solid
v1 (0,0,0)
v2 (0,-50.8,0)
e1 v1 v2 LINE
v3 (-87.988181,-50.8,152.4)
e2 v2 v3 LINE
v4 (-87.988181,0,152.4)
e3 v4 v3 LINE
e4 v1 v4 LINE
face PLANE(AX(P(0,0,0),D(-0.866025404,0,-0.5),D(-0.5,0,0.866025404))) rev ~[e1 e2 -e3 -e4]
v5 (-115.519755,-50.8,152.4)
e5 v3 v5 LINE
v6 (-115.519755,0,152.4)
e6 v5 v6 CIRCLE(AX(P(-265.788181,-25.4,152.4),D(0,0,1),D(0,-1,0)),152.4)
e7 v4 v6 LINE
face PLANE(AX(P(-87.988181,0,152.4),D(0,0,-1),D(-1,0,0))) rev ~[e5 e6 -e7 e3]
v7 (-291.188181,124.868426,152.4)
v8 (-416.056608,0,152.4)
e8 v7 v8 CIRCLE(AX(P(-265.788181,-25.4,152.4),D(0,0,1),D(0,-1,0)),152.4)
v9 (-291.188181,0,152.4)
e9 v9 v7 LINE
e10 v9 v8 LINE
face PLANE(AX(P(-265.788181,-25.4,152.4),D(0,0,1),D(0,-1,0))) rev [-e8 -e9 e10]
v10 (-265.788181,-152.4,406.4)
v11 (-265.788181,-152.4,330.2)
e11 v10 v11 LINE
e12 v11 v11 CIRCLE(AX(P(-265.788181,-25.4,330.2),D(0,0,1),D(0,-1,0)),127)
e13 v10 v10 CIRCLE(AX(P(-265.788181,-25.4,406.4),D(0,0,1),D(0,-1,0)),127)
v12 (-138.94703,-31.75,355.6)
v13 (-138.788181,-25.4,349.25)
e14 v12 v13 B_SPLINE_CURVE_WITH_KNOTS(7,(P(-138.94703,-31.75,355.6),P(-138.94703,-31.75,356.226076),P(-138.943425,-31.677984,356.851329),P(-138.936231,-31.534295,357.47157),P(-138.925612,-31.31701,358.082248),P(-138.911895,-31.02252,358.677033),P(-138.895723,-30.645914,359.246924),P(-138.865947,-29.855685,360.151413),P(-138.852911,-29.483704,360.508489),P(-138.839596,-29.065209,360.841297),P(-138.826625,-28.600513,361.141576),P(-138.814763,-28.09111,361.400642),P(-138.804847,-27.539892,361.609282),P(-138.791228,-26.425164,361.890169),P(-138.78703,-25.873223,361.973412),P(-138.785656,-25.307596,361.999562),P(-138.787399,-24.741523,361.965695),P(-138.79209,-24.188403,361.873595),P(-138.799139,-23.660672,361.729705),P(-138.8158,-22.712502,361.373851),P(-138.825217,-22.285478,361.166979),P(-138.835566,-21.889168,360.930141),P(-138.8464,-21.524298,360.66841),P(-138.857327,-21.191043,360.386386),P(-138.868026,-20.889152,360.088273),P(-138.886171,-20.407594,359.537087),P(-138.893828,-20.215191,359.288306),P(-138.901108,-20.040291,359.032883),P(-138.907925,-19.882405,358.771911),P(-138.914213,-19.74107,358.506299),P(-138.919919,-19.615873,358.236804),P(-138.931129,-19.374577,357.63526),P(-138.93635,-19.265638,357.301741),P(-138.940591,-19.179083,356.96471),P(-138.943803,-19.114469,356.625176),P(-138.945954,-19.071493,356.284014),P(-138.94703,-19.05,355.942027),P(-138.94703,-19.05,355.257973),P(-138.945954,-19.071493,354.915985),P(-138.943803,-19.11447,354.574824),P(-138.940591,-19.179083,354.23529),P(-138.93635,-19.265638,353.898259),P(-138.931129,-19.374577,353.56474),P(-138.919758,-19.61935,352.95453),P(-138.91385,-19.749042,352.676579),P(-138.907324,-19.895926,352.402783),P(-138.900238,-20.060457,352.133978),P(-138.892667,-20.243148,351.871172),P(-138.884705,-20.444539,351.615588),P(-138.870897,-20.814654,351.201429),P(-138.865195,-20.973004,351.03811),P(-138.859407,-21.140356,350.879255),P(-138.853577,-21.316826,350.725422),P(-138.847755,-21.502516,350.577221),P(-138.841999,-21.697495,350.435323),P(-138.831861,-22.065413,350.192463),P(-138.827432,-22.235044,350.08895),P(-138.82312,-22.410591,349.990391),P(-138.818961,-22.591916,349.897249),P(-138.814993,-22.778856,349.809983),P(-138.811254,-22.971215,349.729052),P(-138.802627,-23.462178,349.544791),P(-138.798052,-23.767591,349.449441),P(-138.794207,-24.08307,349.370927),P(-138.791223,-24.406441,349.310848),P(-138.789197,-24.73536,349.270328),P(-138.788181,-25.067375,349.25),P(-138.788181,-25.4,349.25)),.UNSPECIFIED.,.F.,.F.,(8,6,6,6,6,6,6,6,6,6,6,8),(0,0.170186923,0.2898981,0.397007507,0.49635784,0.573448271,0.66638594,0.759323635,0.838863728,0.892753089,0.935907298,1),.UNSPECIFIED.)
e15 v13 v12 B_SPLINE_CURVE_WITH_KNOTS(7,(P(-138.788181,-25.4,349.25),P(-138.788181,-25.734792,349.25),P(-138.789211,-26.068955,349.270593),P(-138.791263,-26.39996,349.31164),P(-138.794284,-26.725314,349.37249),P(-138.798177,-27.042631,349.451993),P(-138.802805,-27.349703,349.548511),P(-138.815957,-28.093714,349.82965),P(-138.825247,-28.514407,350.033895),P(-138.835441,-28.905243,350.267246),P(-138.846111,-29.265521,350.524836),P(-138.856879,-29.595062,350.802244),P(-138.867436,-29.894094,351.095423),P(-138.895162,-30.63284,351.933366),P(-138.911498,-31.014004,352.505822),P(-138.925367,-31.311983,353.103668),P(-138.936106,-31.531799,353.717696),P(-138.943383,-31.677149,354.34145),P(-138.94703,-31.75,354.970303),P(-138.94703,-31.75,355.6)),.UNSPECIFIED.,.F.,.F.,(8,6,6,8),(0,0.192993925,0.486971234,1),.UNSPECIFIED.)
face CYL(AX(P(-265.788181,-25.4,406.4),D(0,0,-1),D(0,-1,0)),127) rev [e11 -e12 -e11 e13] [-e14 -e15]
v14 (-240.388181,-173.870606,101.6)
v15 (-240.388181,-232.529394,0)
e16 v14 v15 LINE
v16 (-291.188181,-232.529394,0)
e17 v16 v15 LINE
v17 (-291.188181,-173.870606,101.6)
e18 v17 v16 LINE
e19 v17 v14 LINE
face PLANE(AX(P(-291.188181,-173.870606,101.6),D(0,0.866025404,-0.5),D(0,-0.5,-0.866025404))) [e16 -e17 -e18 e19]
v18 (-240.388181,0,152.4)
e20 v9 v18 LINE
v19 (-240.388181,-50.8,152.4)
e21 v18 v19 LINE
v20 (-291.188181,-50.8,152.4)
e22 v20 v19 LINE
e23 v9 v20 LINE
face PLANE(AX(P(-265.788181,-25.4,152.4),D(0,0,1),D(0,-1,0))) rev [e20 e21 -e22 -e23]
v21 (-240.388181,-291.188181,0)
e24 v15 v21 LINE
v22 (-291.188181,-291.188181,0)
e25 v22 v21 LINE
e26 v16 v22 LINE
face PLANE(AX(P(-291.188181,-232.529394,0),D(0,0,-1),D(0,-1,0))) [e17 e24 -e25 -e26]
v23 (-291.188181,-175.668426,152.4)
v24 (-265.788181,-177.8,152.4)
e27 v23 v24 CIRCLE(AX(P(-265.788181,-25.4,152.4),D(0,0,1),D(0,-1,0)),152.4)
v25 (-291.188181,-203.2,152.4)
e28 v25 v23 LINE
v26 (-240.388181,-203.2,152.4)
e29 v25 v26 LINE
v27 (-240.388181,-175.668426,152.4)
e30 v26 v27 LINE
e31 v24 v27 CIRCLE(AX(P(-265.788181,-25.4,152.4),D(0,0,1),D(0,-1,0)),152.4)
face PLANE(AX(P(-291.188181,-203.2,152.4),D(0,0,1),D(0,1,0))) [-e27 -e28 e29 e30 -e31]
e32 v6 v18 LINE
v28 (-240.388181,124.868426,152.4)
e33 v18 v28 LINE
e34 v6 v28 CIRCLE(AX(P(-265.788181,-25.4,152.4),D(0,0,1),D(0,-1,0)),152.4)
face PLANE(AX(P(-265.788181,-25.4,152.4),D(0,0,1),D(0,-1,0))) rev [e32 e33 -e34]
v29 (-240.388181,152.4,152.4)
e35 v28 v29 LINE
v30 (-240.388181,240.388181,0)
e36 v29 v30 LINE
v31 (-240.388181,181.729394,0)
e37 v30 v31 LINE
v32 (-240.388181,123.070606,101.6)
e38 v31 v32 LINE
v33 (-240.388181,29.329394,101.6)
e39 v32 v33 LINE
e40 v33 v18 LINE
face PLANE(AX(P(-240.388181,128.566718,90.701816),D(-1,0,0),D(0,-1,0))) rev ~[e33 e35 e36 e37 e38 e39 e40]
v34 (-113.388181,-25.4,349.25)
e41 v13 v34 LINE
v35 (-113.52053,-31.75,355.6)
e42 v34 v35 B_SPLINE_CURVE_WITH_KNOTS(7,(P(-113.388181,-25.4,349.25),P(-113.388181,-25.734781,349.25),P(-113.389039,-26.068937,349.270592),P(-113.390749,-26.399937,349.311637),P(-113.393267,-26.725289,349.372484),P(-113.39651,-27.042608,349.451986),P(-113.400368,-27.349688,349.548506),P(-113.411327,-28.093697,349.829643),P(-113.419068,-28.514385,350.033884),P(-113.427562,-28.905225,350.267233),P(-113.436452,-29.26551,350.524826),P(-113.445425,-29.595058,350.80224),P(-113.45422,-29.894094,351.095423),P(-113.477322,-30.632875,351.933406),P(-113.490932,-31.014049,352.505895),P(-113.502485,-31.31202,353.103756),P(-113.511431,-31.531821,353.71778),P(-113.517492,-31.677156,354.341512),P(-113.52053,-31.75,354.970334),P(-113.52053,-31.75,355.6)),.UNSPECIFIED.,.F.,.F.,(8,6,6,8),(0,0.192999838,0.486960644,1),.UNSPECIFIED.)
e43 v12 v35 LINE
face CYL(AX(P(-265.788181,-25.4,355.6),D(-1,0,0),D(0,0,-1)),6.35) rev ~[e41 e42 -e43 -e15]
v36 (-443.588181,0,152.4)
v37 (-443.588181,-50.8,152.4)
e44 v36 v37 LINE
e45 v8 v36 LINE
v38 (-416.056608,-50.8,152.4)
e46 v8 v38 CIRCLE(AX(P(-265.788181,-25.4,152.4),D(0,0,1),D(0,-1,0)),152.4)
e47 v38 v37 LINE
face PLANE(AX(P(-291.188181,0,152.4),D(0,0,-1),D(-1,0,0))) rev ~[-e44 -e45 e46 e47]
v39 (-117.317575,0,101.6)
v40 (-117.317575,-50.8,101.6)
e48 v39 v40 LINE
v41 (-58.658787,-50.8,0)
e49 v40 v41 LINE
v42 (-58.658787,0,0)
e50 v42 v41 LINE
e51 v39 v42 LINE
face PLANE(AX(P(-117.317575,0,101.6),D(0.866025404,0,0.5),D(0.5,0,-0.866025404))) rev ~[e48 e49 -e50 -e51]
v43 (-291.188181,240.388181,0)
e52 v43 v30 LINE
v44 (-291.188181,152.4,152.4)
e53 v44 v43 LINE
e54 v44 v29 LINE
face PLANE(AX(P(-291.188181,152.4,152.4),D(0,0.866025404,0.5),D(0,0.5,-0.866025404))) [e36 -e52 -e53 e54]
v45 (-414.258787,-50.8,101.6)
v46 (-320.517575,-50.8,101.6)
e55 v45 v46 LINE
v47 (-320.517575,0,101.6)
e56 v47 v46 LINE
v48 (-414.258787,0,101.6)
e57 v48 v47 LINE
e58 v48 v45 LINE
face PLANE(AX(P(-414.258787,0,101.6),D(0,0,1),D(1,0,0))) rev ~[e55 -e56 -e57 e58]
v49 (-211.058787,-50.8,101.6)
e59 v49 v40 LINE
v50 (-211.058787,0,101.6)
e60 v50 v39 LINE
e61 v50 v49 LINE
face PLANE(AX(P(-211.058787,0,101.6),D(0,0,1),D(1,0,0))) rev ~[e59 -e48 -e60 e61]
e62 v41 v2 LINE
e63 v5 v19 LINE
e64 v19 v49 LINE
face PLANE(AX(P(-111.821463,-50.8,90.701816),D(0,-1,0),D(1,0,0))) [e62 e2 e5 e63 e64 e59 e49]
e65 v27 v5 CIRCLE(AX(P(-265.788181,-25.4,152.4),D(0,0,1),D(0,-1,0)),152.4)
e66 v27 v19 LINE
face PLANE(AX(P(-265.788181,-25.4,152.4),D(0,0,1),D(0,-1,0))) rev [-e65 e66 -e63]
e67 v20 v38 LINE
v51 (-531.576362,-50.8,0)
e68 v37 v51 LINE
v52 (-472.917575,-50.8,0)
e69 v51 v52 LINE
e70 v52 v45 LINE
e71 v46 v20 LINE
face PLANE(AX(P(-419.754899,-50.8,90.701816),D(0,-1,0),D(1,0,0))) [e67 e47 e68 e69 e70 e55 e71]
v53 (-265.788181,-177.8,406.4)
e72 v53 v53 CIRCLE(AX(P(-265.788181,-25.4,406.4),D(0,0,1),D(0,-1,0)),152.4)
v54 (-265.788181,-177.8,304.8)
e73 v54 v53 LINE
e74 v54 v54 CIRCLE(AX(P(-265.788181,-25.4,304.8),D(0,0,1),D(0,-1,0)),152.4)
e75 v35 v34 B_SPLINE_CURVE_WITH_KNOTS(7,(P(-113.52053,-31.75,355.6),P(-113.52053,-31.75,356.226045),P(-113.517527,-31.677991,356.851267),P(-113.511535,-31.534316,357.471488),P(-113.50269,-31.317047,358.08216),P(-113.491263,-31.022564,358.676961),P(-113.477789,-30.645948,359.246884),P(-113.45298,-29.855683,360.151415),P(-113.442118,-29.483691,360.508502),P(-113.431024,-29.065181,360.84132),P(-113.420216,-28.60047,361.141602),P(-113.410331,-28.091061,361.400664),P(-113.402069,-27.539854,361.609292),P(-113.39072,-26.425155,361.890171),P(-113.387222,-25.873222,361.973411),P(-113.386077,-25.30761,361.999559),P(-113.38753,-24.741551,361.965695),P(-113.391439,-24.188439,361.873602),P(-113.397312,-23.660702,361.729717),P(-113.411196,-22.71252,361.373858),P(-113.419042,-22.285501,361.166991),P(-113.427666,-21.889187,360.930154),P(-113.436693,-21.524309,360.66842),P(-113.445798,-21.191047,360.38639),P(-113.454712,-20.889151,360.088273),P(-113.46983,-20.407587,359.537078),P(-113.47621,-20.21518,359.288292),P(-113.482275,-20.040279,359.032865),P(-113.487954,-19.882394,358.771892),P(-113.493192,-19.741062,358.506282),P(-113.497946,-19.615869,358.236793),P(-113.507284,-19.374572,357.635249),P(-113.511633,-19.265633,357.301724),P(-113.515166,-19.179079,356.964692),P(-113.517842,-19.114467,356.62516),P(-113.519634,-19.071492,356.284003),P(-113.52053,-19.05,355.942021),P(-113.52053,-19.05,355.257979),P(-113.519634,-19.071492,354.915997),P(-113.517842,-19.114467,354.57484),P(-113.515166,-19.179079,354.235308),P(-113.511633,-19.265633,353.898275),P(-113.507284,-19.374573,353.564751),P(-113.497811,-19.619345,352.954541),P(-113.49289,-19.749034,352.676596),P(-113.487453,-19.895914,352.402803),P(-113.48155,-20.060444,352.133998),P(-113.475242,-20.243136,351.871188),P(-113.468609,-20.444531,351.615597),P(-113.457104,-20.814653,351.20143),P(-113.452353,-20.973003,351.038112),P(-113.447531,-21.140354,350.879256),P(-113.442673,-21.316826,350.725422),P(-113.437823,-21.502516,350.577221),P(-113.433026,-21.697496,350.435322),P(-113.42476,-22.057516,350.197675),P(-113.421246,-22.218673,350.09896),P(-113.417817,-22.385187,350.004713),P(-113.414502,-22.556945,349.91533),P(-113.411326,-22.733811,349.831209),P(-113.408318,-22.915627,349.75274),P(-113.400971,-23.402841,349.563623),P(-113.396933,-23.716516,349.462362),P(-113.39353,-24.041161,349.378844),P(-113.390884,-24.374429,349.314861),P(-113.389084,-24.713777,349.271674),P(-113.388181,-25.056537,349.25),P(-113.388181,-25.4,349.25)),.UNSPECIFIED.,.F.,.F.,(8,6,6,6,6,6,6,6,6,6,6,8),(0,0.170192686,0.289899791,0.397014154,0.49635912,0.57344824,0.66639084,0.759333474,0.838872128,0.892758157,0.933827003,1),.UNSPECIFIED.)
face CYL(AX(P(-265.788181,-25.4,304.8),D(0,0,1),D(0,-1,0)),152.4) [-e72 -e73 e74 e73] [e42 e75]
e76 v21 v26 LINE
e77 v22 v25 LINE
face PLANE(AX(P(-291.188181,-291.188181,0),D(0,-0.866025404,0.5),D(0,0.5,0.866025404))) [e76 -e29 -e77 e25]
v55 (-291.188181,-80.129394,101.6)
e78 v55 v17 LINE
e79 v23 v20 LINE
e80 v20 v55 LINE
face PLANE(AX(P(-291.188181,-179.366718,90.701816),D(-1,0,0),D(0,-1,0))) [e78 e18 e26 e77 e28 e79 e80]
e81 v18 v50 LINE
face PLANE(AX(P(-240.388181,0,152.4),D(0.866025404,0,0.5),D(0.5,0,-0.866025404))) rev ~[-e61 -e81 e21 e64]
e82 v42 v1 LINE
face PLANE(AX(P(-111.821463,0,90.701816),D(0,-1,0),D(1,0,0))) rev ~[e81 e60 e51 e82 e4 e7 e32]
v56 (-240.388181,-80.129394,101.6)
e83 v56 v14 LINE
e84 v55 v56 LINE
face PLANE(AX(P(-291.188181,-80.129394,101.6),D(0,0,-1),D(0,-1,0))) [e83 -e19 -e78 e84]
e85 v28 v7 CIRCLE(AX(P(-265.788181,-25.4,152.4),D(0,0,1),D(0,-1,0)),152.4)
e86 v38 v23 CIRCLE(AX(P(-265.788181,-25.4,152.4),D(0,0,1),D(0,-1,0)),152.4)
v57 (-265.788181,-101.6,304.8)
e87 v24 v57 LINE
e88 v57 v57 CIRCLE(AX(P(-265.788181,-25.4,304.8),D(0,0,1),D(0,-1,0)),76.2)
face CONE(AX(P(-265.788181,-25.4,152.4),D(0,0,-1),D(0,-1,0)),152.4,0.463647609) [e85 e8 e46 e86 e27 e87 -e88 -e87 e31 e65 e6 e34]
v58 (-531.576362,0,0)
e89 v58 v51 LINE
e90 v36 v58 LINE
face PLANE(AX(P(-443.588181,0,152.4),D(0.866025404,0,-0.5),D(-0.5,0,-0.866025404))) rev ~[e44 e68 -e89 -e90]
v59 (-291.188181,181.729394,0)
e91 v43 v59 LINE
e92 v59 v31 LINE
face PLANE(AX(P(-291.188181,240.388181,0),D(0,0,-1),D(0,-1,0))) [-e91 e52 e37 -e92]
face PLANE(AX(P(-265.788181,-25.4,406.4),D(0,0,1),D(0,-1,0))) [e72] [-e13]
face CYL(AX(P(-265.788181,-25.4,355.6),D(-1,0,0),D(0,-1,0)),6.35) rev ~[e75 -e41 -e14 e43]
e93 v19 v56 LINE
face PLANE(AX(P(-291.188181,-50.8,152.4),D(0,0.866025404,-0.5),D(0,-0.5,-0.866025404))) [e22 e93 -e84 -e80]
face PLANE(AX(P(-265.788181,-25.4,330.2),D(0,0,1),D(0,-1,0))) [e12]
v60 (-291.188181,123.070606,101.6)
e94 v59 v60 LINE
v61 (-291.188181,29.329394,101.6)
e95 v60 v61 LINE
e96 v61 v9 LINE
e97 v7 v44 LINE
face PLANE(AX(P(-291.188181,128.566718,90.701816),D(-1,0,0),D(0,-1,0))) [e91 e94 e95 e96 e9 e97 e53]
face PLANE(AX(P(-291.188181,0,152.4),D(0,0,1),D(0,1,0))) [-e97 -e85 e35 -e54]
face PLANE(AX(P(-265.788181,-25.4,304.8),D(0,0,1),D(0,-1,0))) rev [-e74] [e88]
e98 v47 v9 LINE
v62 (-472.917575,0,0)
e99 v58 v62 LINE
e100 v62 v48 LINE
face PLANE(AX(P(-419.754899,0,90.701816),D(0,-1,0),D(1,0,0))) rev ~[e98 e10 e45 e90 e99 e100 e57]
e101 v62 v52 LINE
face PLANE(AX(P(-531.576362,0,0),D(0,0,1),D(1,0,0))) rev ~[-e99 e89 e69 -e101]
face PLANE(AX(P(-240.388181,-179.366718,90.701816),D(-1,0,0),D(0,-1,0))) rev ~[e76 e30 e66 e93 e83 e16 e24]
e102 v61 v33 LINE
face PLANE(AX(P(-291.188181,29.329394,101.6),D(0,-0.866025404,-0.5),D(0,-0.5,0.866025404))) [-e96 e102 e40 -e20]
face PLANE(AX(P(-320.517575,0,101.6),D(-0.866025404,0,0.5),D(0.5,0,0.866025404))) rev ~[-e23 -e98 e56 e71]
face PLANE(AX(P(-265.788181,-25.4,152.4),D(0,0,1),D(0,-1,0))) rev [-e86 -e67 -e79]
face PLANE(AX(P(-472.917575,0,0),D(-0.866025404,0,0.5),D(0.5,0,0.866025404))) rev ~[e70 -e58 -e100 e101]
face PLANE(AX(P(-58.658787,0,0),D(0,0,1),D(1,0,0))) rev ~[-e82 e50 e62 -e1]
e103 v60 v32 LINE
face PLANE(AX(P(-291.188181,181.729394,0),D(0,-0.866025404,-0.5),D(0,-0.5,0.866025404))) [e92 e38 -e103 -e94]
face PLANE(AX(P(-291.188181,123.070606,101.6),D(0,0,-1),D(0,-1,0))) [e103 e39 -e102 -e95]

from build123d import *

# Parameters (mm, degrees)
F1_DEPTH  = 50.8
F4_DEPTH  = 50.8
F11_DEPTH = 762


with BuildPart() as f1:
    # F0 (on Front) → F1 (new body)
    with BuildSketch(Plane.XZ):
        Polygon((-320.5175746993, 101.6), (-291.1881810245, 152.4), (-443.5881810245, 152.4), (-531.576362049, 0), (-472.9175746993, 0), (-414.2587873497, 101.6), align=None)
    extrude(amount=F1_DEPTH)



with BuildPart() as f1b:
    # F0 (on Front) → F1, piece 2 (new body)
    with BuildSketch(Plane.XZ):
        Polygon((-58.6587873497, 0), (0, 0), (-87.9881810245, 152.4), (-240.3881810245, 152.4), (-211.0587873497, 101.6), (-117.3175746993, 101.6), align=None)
    extrude(amount=F1_DEPTH)


with BuildPart() as f1_1:
    add(f1.part)

    add(f1b.part)  # F4 merges F1b
    # F3 (on face) → F4 (join)
    with BuildSketch(Plane(origin=(-291.1881810245, 0, 0), x_dir=(0, -1, 0), z_dir=(-1, 0, 0))):
        Polygon((203.2, 152.4), (50.8, 152.4), (80.1293936748, 101.6), (173.8706063252, 101.6), (232.5293936748, 0), (291.1881810245, 0), align=None)
        Polygon((-29.3293936748, 101.6), (0, 152.4), (-152.4, 152.4), (-240.3881810245, 0), (-181.7293936748, 0), (-123.0706063252, 101.6), align=None)
    extrude(amount=-F4_DEPTH)

    # F7 (on face) → F9 (revolve)
    with BuildSketch(Plane(origin=(-265.7881810245, 0, 0), x_dir=(0, -1, 0), z_dir=(-1, 0, 0))):
        Polygon((25.4, 304.8), (25.4, 152.4), (177.8, 152.4), (101.6, 304.8), align=None)
    revolve(axis=Axis((-265.7881810245, -25.4, 228.6), (0, 0, 1)))

    # F7 (on face) → F10 (revolve)
    with BuildSketch(Plane(origin=(-265.7881810245, 0, 0), x_dir=(0, -1, 0), z_dir=(-1, 0, 0))):
        Polygon((25.4, 330.2), (25.4, 304.8), (101.6, 304.8), (177.8, 304.8), (177.8, 406.4), (152.4, 406.4), (152.4, 330.2), align=None)
    revolve(axis=Axis((-265.7881810245, -25.4, 330.2), (0, 0, 1)))

    # F7 (on face) → F11 (cut)
    with BuildSketch(Plane(origin=(-265.7881810245, 0, 0), x_dir=(0, -1, 0), z_dir=(-1, 0, 0))):
        with BuildLine():
            ThreePointArc((31.75, 355.6), (20.9098719395, 360.0901280605), (25.4, 349.25))
            ThreePointArc((25.4, 349.25), (29.8901280605, 351.1098719395), (31.75, 355.6))
        make_face()
    extrude(amount=-F11_DEPTH, mode=Mode.SUBTRACT)


solid = f1_1.part
